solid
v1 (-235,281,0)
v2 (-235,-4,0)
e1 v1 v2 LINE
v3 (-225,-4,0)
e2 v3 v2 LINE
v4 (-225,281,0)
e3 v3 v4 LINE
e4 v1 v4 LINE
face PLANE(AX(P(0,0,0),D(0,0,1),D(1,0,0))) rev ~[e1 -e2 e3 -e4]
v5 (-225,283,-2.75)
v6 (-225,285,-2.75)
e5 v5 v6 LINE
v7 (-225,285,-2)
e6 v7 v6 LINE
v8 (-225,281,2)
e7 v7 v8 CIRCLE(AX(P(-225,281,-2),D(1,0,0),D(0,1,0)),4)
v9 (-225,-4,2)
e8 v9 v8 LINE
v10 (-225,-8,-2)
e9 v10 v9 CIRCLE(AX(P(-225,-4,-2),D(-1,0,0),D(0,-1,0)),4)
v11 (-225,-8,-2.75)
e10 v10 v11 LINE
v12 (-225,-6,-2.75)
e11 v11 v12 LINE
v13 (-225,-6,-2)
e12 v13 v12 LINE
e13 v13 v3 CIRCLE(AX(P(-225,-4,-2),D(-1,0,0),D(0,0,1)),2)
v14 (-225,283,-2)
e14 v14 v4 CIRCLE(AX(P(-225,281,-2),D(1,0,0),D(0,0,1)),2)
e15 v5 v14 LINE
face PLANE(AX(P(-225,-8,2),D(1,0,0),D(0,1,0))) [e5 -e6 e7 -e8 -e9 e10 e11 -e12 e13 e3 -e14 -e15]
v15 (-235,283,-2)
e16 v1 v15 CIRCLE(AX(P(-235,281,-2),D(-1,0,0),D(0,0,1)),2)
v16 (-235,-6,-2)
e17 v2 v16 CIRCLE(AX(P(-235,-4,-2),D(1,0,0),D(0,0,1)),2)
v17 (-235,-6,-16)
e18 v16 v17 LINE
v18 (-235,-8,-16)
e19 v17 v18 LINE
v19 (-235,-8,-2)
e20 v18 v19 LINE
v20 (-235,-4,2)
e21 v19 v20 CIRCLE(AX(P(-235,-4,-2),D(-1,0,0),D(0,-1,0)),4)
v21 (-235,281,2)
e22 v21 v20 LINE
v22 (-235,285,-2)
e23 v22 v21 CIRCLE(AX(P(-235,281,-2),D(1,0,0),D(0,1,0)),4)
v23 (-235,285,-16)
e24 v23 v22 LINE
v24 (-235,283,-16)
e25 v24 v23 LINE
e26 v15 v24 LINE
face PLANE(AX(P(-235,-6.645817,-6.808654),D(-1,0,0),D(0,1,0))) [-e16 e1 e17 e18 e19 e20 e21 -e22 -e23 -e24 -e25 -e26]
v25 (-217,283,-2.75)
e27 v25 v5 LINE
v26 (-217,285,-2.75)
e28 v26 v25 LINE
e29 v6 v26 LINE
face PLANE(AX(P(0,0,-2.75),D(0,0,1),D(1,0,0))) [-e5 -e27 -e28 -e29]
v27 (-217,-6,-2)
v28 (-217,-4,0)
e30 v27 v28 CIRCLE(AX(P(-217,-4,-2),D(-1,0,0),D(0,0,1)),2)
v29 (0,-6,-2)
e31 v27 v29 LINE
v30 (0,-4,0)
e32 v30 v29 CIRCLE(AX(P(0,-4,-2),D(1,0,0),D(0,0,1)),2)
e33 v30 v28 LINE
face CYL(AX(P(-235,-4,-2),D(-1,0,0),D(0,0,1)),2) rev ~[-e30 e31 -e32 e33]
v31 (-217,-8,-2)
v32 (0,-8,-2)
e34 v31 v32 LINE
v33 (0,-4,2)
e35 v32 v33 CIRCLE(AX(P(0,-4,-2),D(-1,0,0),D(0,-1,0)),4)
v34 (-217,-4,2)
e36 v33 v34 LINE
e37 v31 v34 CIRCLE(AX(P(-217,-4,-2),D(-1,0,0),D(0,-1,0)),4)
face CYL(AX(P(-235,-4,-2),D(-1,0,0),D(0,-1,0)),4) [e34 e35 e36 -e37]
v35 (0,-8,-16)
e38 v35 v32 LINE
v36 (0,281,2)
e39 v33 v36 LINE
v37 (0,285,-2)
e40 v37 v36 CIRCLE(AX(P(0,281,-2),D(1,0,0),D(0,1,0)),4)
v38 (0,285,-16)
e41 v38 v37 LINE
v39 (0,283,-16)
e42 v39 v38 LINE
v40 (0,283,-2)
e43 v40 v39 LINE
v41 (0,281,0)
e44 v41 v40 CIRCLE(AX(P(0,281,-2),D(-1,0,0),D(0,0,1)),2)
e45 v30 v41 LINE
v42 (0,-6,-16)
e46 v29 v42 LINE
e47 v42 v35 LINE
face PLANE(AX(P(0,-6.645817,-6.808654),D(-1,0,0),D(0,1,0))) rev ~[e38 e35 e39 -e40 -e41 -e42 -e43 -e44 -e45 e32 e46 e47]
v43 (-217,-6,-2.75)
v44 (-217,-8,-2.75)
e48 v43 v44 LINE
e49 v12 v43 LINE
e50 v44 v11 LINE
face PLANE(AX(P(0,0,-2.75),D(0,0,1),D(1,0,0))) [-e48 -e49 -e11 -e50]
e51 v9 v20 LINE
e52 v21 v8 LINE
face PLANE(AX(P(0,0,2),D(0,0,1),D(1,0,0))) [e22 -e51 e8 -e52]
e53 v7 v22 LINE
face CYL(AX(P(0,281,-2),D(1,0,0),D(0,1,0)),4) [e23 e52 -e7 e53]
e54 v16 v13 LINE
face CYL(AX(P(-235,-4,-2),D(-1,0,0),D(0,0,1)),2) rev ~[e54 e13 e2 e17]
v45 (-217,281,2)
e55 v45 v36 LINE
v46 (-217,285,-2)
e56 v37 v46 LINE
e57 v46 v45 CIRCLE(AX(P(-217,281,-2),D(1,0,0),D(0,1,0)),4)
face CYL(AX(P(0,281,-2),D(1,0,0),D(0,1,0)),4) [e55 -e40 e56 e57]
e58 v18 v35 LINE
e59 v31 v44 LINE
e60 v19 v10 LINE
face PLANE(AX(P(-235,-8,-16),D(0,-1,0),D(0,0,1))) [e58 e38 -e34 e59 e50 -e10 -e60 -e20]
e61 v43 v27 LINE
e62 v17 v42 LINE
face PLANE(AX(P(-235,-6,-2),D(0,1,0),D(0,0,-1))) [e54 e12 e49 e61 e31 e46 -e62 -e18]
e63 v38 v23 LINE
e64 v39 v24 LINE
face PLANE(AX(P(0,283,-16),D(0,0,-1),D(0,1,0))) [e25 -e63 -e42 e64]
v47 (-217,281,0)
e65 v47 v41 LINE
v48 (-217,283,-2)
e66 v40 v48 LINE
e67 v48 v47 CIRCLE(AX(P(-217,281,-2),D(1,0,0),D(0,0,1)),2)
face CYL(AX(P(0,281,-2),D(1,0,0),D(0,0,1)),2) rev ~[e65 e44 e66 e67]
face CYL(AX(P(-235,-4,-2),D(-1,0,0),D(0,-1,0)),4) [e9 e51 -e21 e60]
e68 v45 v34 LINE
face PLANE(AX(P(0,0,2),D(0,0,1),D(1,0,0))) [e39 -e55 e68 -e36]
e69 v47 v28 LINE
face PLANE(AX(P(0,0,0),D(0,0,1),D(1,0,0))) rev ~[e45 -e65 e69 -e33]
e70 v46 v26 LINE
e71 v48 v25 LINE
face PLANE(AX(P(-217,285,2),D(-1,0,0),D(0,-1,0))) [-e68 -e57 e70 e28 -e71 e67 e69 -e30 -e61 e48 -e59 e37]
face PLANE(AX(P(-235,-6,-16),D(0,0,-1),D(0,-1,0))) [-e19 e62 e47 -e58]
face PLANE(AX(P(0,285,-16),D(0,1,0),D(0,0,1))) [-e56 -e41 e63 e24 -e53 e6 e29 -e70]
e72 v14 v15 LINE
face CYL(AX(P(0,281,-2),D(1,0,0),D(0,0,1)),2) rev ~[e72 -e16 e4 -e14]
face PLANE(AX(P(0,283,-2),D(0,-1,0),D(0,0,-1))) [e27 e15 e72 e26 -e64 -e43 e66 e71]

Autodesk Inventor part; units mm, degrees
ref_plane "YZ Plane" through (0, 0, 0) normal (1, 0, 0) x (0, 1, 0)
ref_plane "XZ Plane" through (0, 0, 0) normal (0, 1, 0) x (-1, 0, 0)
ref_plane "XY Plane" through (0, 0, 0) normal (0, 0, 1) x (1, 0, 0)
sketch "Skizze1" plane through (0, 0, 0) normal (0, 0, 1) x (1, 0, 0)
  line L0 (-273, 285) -> (68, 285)
  line L1 (68, -8) -> (-273, -8)
  line L2 (5, 153.9294) -> (5, 157.0706)
  line L3 (5, 253.9294) -> (5, 257.0706)
  line L4 (0, 285) -> (-235, 285)
  line L5 (-235, 285) -> (-235, -8)
  line L6 (-235, -8) -> (0, -8)
  line L7 (0, -8) -> (0, 285)
  line L8 (-199.0415, -3.8) -> (-199.0415, -6)
  line L9 (-138, 2) -> (-138, 4.5)
  line L10 (-250, 282.9) -> (-250, -5.9)
  point P0 (0, 0)
  point P1 (-273, -8)
  dimension "d0" = 5
  dimension "d1" = 0
  dimension "d2" = 0
  dimension "d15" = 15
extrude "Grobblech1" add sketch "Skizze1" along normal blind 2
sketch "Skizze2" plane through (-235, -6, 2) normal (0, -1, 0) x (1, 0, 0)
  line L0 (235, 0) -> (0, 0)
  line L1 (0, 0) -> (0, -18)
  line L2 (0, -18) -> (235, -18)
  line L3 (235, -18) -> (235, 0)
edge flange "Lasche1" height 18 angle 90 thickness 2 bend radius 2 thickness toward (0, -1, 0) relief tear relief width 2 relief depth 1 corner gap 2 corner form 0 edges at (-117.5, -8, 0) (-117.5, 285, 0) wall of the first edge with corners at (0, -6, 2) (-235, -6, 2) (-235, -6, -16) (0, -6, -16)
bend "Biegung1"
corner "Ecke1"
sketch "Skizze3" plane through (0, 0, 2) normal (0, 0, 1) x (1, 0, 0)
  line L0 (-273, 285) -> (68, 285) construction
  line L1 (0, 281) -> (0, -4) construction
  line L2 (0, 281) -> (0, 285) construction
  line L3 (0, -8) -> (0, -4) construction
  line L4 (68, -8) -> (-273, -8) construction
  line L5 (-235, -4) -> (-235, 281) construction
  line L6 (-235, 285) -> (-235, 281) construction
  line L7 (-235, -4) -> (-235, -8) construction
  line L8 (-250, 282.9) -> (-250, -5.9) construction
  line L9 (-225, 285) -> (-225, -8) construction
  line L10 (0, -8) -> (-235, -8) projected
  line L11 (-225, 285) -> (-217, 285)
  line L12 (-217, 285) -> (-217, -8)
  line L13 (-217, -8) -> (-225, -8)
  line L14 (-225, -8) -> (-225, 285)
  point P0 (0, 0)
  dimension "d16" = 25
  dimension "d17" = 8
  dimension "d18" = 293
extrude "Extrusion1" cut sketch "Skizze3" against normal blind 4.75
equation "\"d4\" = Stärke"
equation "\"d5\" = BreiteBiegungsfreistellung"
equation "\"d6\" = TiefeBiegungsfreistellung"
equation "\"d7\" = MinimalRest"
equation "\"d8\" = Übergangsradius"
equation "\"d11\" = Biegeradius"
equation "\"d12\" = GrößeEckenfreistellung"
equation "\"d13\" = Abstandsgröße"
equation "\"d14\" = JacobiRadiusGröße"
equation "\"Biegeradius\" = Stärke"
equation "\"BreiteBiegungsfreistellung\" = Stärke"
equation "\"TiefeBiegungsfreistellung\" = 0.5 * Stärke"
equation "\"GrößeEckenfreistellung\" = 4 * Stärke"
equation "\"MinimalRest\" = 2 * Stärke"
equation "\"Übergangsradius\" = Biegeradius"
equation "\"JacobiRadiusGröße\" = Biegeradius"
equation "\"Abstandsgröße\" = Stärke"
equation "\"Stärke\" = 2"
properties part number "EinschubRechts"
